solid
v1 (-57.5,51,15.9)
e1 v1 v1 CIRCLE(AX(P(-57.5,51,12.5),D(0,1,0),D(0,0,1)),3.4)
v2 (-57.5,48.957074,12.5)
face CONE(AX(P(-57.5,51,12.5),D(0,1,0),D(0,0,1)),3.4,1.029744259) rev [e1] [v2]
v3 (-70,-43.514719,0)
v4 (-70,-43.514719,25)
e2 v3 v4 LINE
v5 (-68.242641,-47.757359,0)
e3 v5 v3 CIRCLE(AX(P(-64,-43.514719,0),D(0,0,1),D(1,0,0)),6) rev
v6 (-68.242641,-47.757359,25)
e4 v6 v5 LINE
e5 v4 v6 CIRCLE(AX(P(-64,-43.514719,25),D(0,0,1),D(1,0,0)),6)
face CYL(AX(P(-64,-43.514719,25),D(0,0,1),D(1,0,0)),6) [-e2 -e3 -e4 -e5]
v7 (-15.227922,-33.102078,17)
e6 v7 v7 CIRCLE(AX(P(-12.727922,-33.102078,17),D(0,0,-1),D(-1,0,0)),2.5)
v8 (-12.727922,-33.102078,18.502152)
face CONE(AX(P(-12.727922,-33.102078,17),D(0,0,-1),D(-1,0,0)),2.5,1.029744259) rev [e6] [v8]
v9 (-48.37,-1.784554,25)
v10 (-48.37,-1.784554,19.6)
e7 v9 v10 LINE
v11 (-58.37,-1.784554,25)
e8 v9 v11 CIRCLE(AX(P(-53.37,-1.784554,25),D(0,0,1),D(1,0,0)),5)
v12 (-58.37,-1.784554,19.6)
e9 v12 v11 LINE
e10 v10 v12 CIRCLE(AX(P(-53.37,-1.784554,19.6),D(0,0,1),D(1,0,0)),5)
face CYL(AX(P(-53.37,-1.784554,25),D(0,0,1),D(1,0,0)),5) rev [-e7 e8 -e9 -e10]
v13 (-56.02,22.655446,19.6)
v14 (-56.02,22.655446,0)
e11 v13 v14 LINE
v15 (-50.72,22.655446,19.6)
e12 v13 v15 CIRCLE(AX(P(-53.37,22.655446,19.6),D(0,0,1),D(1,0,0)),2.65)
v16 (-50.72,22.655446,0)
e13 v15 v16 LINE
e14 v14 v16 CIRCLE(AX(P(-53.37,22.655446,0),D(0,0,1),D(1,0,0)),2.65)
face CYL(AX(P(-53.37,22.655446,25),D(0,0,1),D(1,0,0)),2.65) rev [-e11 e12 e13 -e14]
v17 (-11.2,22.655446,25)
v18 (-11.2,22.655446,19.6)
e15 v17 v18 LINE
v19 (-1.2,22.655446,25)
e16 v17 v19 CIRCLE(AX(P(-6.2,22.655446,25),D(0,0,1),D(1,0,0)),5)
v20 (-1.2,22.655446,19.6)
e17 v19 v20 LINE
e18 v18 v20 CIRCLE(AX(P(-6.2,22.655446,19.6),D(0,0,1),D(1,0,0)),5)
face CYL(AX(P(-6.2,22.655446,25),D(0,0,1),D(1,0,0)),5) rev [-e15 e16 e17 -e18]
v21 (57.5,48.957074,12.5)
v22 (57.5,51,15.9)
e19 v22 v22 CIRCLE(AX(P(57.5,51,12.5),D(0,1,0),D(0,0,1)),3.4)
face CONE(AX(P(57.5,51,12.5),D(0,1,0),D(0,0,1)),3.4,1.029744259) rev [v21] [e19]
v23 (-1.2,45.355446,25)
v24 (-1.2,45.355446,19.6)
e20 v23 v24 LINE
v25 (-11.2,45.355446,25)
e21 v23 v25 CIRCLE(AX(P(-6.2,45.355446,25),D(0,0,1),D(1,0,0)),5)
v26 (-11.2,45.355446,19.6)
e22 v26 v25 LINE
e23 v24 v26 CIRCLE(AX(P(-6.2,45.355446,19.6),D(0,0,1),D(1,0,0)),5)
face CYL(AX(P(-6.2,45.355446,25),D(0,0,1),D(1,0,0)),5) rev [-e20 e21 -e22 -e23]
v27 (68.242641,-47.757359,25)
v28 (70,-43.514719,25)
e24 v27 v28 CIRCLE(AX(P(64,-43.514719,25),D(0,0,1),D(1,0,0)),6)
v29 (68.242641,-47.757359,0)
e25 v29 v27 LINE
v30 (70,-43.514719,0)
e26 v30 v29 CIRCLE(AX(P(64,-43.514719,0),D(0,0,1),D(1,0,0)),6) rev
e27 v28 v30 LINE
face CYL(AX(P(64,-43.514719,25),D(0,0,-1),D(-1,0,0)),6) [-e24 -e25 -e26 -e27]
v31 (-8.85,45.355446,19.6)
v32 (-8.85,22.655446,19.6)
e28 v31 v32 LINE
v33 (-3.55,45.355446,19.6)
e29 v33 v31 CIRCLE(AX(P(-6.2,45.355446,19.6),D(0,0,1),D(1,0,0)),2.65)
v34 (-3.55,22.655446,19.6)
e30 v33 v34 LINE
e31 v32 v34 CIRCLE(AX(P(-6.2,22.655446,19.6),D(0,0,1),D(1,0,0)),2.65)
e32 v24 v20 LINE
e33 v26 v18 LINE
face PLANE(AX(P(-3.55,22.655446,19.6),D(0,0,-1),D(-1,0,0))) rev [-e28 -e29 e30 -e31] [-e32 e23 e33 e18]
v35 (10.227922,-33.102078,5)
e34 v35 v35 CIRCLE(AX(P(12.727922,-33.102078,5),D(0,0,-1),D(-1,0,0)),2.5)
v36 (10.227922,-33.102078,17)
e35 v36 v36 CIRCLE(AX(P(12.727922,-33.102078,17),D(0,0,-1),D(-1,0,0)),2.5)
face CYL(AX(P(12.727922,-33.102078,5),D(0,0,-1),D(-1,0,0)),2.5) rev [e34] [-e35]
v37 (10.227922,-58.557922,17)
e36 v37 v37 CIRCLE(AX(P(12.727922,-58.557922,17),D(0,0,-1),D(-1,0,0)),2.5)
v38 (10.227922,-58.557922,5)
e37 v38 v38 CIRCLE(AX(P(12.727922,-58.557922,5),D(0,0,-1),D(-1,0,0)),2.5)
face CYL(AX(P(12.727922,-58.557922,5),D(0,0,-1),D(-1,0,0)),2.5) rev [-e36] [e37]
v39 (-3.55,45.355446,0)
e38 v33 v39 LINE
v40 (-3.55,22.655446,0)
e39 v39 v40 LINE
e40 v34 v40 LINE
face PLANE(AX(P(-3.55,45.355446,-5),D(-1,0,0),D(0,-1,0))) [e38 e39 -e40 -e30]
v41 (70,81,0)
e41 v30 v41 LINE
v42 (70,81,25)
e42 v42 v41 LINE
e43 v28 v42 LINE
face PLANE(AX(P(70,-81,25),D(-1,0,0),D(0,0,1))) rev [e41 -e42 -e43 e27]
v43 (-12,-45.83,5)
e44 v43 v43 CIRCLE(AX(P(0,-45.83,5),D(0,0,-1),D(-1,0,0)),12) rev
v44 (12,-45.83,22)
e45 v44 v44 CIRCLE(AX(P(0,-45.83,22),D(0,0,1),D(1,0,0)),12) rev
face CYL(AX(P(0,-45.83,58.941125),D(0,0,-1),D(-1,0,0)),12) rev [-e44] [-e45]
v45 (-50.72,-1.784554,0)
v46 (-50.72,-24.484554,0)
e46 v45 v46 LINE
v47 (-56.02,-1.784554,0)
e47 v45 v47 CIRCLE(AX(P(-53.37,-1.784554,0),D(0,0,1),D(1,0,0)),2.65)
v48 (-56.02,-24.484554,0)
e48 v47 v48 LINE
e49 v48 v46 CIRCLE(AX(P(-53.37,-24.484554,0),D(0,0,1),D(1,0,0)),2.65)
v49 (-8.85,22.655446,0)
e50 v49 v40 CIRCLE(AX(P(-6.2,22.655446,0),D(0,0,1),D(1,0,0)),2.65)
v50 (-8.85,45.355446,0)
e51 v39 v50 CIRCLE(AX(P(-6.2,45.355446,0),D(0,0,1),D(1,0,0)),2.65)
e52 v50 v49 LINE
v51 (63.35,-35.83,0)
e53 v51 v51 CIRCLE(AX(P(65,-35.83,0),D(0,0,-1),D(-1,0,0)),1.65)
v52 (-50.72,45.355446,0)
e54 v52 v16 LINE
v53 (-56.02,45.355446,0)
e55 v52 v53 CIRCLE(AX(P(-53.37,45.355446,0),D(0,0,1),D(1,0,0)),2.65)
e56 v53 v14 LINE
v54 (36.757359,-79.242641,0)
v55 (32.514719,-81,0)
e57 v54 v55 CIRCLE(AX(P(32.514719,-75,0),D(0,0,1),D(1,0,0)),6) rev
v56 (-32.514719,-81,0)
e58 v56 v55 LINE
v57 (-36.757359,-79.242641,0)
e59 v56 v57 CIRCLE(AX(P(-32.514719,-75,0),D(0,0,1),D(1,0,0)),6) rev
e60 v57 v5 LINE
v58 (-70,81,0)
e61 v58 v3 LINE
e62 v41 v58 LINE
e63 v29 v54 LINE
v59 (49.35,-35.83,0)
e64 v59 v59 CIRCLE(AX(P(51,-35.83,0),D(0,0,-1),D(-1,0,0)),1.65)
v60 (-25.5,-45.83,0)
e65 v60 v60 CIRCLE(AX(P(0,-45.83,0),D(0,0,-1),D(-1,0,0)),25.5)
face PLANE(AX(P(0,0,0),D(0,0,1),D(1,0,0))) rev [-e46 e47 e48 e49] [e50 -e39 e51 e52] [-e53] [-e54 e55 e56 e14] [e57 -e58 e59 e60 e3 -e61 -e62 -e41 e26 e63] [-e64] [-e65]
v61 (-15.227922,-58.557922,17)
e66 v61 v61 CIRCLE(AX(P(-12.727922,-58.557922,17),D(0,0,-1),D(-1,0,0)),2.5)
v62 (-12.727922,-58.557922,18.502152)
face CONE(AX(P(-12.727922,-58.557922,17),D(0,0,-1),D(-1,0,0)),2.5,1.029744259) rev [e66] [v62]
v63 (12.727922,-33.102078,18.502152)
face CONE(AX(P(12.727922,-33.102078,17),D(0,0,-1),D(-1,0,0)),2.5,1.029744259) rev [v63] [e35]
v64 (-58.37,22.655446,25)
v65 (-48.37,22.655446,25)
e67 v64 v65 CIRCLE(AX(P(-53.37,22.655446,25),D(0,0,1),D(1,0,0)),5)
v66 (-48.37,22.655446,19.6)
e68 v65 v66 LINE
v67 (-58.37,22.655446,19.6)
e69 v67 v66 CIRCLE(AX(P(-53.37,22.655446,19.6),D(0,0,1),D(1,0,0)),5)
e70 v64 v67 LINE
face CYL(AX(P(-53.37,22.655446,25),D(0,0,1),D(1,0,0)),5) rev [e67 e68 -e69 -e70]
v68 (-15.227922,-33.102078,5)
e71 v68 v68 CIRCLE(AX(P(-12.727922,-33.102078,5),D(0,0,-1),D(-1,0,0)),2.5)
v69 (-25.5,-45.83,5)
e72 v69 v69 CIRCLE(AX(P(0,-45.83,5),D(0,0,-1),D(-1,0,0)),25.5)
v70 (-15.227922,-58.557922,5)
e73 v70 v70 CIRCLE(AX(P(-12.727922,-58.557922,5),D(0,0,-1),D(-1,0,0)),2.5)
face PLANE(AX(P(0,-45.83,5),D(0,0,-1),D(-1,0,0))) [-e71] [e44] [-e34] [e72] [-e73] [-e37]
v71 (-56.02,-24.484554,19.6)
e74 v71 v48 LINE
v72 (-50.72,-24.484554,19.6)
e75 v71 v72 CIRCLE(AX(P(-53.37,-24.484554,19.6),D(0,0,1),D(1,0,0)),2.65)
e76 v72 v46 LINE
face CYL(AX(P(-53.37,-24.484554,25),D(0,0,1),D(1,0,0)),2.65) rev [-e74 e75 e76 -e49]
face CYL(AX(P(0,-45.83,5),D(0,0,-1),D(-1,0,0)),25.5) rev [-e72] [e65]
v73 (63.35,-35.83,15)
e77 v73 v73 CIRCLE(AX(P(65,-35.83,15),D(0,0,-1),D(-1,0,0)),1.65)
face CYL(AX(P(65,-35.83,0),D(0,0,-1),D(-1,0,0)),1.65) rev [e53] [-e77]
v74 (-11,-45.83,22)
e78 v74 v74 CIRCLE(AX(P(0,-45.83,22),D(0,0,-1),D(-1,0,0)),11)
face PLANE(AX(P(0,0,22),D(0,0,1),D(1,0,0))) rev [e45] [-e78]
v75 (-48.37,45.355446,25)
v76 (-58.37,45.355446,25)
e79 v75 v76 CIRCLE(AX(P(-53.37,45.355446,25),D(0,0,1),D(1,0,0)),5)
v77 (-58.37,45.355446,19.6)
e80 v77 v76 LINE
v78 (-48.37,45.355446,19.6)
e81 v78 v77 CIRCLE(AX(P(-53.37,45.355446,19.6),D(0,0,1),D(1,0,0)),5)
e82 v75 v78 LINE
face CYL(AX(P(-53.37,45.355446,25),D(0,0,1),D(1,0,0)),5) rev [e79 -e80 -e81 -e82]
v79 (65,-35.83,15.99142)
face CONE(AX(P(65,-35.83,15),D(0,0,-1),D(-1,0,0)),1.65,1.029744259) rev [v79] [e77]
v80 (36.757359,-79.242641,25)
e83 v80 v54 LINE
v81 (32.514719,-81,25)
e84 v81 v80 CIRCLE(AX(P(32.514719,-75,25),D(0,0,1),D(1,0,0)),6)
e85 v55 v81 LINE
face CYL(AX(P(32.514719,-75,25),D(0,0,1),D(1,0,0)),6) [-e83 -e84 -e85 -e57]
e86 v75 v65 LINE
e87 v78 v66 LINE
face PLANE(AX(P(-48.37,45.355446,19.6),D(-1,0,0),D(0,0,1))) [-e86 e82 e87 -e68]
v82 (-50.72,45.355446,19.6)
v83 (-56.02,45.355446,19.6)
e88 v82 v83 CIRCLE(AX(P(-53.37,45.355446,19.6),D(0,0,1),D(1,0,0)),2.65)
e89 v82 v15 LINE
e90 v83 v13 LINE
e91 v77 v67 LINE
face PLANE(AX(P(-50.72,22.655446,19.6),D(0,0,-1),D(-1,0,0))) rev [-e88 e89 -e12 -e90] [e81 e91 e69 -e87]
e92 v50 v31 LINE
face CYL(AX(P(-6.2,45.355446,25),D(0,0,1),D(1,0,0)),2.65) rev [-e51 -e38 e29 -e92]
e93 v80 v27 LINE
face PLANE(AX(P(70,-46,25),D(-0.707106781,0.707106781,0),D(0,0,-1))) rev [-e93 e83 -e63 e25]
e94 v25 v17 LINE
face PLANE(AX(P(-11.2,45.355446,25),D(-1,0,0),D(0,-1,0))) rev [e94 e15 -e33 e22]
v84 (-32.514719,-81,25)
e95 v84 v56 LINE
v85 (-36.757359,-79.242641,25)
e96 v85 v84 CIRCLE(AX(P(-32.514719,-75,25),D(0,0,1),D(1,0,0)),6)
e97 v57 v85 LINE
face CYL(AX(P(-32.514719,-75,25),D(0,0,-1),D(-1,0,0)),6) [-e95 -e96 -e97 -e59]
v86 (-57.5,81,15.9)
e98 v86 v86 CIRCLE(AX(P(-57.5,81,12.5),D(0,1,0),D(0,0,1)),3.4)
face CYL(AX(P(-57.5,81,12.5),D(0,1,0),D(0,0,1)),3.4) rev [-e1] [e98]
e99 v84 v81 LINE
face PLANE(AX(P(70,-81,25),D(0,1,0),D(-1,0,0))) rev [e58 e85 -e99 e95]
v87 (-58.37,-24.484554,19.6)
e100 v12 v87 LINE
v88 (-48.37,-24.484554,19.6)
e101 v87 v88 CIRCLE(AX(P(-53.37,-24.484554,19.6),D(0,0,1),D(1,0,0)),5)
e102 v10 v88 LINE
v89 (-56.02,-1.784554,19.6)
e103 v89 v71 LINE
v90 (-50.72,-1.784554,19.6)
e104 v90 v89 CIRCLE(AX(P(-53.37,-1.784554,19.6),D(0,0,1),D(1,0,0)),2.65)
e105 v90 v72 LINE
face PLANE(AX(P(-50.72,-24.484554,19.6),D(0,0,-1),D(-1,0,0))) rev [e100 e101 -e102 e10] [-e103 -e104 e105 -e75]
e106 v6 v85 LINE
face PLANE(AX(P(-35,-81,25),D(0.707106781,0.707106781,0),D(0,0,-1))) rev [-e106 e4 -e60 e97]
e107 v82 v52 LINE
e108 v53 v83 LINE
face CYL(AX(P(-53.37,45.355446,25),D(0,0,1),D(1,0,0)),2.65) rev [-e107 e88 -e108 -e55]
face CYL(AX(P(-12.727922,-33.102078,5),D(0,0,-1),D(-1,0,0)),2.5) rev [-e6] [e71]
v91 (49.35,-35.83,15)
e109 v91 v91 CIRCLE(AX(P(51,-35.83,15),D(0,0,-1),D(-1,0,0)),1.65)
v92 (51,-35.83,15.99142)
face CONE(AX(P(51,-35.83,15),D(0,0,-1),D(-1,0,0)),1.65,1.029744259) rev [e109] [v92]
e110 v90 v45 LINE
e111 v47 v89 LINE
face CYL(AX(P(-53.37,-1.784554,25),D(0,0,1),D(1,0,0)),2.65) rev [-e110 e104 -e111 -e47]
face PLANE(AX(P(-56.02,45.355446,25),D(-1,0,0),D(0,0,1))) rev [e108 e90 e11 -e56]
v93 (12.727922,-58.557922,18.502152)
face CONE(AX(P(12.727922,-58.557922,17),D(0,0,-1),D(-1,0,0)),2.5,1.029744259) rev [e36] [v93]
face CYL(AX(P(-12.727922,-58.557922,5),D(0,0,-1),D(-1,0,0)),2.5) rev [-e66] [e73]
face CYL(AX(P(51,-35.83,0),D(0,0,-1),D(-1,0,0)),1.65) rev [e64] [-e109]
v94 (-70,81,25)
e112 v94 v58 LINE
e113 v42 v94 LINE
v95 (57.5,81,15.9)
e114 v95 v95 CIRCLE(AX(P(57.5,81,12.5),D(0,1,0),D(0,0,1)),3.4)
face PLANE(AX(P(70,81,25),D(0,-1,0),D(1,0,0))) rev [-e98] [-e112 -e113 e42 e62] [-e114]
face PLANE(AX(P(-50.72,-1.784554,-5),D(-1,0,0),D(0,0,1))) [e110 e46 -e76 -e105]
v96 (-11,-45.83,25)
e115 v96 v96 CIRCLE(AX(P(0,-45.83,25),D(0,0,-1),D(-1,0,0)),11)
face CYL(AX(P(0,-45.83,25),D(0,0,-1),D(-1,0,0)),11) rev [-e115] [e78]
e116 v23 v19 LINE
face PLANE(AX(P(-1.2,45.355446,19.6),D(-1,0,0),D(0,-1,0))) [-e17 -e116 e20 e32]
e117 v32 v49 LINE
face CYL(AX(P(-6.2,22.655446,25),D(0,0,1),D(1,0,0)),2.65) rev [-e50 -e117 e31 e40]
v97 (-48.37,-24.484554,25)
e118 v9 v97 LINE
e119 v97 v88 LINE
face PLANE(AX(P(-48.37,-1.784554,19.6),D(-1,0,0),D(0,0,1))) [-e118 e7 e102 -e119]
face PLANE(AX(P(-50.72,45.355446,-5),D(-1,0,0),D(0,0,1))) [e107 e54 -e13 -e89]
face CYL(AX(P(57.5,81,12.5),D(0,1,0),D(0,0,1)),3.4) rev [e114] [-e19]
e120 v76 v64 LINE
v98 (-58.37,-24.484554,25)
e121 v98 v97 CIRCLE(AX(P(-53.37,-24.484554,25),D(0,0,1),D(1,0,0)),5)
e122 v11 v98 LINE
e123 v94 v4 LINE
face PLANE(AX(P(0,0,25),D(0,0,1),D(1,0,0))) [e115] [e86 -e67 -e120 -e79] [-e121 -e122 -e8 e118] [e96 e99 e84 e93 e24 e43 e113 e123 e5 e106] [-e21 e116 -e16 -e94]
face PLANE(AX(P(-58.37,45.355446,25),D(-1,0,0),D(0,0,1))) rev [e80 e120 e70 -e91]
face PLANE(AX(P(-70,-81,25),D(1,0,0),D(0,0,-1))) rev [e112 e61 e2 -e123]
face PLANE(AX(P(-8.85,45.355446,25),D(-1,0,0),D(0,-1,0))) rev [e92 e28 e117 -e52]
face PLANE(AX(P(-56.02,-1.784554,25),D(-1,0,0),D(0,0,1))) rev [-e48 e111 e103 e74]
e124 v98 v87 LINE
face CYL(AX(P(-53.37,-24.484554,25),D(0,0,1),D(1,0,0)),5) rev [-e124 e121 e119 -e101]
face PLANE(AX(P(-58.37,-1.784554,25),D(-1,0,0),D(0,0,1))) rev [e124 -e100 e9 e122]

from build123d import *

# Parameters (mm, degrees)
ESQUISSE1_W                                   = 140
ESQUISSE1_H                                   = 162
BOSS_EXTRU_1_DEPTH                            = 25
TROU_POUR_TARAUDAGE_POUR_TROU_TARAUD_M8_D     = 6.8
TROU_POUR_TARAUDAGE_POUR_TROU_TARAUD_M8_DEPTH = 30
TROU_POUR_TARAUDAGE_POUR_TROU_TARAUD_M8_TIP   = 2.042926105
CHANFREIN1_SIZE                               = 35
CONG_3_R                                      = 6
ESQUISSE15_R                                  = 12
ENL_V_MAT_EXTRU_4_DEPTH                       = 22
ESQUISSE16_R                                  = 11
ENL_V_MAT_EXTRU_5_DEPTH                       = 110.293183685
TROU_POUR_TARAUDAGE_POUR_TROU_TARAUD_M4_D     = 3.3
TROU_POUR_TARAUDAGE_POUR_TROU_TARAUD_M4_DEPTH = 15
TROU_POUR_TARAUDAGE_POUR_TROU_TARAUD_M4_TIP   = 0.991420021
ESQUISSE41_R                                  = 25.5
ENL_V_MAT_EXTRU_15_DEPTH                      = 5
TROU_POUR_TARAUDAGE_POUR_TROU_TARAUD_M6_D     = 5
TROU_POUR_TARAUDAGE_POUR_TROU_TARAUD_M6_DEPTH = 12
TROU_POUR_TARAUDAGE_POUR_TROU_TARAUD_M6_TIP   = 1.502151548
RAINURE_DE_CHAMBRAGE_POUR_VIS_T_TE_HEX_DEPTH  = 25
RAINURE_START                                 = 19.6
RAINURE_DE_CHAMBRAGE_POUR_VIS_T_TE_3_DEPTH    = 5.4


# Read off the part's stored shape, not the designer's step: Rainure de chambrage pour vis à tête hexagonale M52
with BuildPart() as part:
    # Esquisse1 → Boss.-Extru.1 (new body)
    with BuildSketch(Plane.XY):
        Rectangle(ESQUISSE1_W, ESQUISSE1_H)
    extrude(amount=BOSS_EXTRU_1_DEPTH)

    # Trou pour taraudage pour trou taraudé M81
    with Locations(Plane(origin=(0, 81, 0), x_dir=(1, 0, 0), z_dir=(0, 1, 0))):
        with Locations((-57.5, -12.5), (57.5, -12.5)):
            Hole(TROU_POUR_TARAUDAGE_POUR_TROU_TARAUD_M8_D / 2, depth=TROU_POUR_TARAUDAGE_POUR_TROU_TARAUD_M8_DEPTH)
            with Locations((0, 0, -(TROU_POUR_TARAUDAGE_POUR_TROU_TARAUD_M8_DEPTH + TROU_POUR_TARAUDAGE_POUR_TROU_TARAUD_M8_TIP / 2))):  # 118° drill point
                Cone(0, TROU_POUR_TARAUDAGE_POUR_TROU_TARAUD_M8_D / 2, TROU_POUR_TARAUDAGE_POUR_TROU_TARAUD_M8_TIP, mode=Mode.SUBTRACT)

    # Chanfrein1
    chanfrein1_edges = [part.edges().sort_by_distance(p)[0] for p in [
        (70, -81, 12.5),
        (-70, -81, 12.5),
    ]]
    chamfer(chanfrein1_edges, length=CHANFREIN1_SIZE)

    # Congé3
    cong_3_edges = [part.edges().sort_by_distance(p)[0] for p in [
        (35, -81, 12.5),
        (-35, -81, 12.5),
        (-70, -46, 12.5),
        (70, -46, 12.5),
    ]]
    fillet(cong_3_edges, radius=CONG_3_R)

    # Esquisse15 → Enlèv. mat.-Extru.4 (cut)
    with BuildSketch(Plane(origin=(0, 0, 0), x_dir=(-1, 0, 0), z_dir=(0, 0, -1))):
        with Locations((0, -45.83)):
            Circle(ESQUISSE15_R)
    extrude(amount=-ENL_V_MAT_EXTRU_4_DEPTH, mode=Mode.SUBTRACT)

    # Esquisse16 → Enlèv. mat.-Extru.5 (cut, through all)
    with BuildSketch(Plane(origin=(0, 0, 22), x_dir=(-1, 0, 0), z_dir=(0, 0, -1))):
        with Locations((0, -45.83)):
            Circle(ESQUISSE16_R)
    extrude(amount=-ENL_V_MAT_EXTRU_5_DEPTH, mode=Mode.SUBTRACT)

    # Trou pour taraudage pour trou taraudé M41
    with Locations(Plane(origin=(0, 0, 0), x_dir=(-1, 0, 0), z_dir=(0, 0, -1))):
        with Locations((-65, -35.83), (-51, -35.83)):
            Hole(TROU_POUR_TARAUDAGE_POUR_TROU_TARAUD_M4_D / 2, depth=TROU_POUR_TARAUDAGE_POUR_TROU_TARAUD_M4_DEPTH)
            with Locations((0, 0, -(TROU_POUR_TARAUDAGE_POUR_TROU_TARAUD_M4_DEPTH + TROU_POUR_TARAUDAGE_POUR_TROU_TARAUD_M4_TIP / 2))):  # 118° drill point
                Cone(0, TROU_POUR_TARAUDAGE_POUR_TROU_TARAUD_M4_D / 2, TROU_POUR_TARAUDAGE_POUR_TROU_TARAUD_M4_TIP, mode=Mode.SUBTRACT)

    # Esquisse41 → Enlèv. mat.-Extru.15 (cut)
    with BuildSketch(Plane(origin=(0, 0, 0), x_dir=(-1, 0, 0), z_dir=(0, 0, -1))):
        with Locations((0, -45.83)):
            Circle(ESQUISSE41_R)
    extrude(amount=-ENL_V_MAT_EXTRU_15_DEPTH, mode=Mode.SUBTRACT)

    # Trou pour taraudage pour trou taraudé M61
    with Locations(Plane(origin=(0, 0, 5), x_dir=(-1, 0, 0), z_dir=(0, 0, -1))):
        with Locations((12.727922061, -33.102077939), (-12.727922061, -58.557922061), (-12.727922061, -33.102077939), (12.727922061, -58.557922061)):
            Hole(TROU_POUR_TARAUDAGE_POUR_TROU_TARAUD_M6_D / 2, depth=TROU_POUR_TARAUDAGE_POUR_TROU_TARAUD_M6_DEPTH)
            with Locations((0, 0, -(TROU_POUR_TARAUDAGE_POUR_TROU_TARAUD_M6_DEPTH + TROU_POUR_TARAUDAGE_POUR_TROU_TARAUD_M6_TIP / 2))):  # 118° drill point
                Cone(0, TROU_POUR_TARAUDAGE_POUR_TROU_TARAUD_M6_D / 2, TROU_POUR_TARAUDAGE_POUR_TROU_TARAUD_M6_TIP, mode=Mode.SUBTRACT)

    # Rainure de chambrage pour vis _ t_te 2 → Rainure de chambrage pour vis à tête hexagonale M52 (cut)
    with BuildSketch(Plane.XY):
        with BuildLine():
            Line((-50.72, -24.484553863), (-50.72, -1.784553863))
            ThreePointArc((-50.72, -1.784553863), (-53.37, 0.865446137), (-56.02, -1.784553863))
            Line((-56.02, -1.784553863), (-56.02, -24.484553863))
            ThreePointArc((-56.02, -24.484553863), (-53.37, -27.134553863), (-50.72, -24.484553863))
        make_face()
        with BuildLine():
            Line((-50.72, 22.655446137), (-50.72, 45.355446137))
            ThreePointArc((-50.72, 45.355446137), (-53.37, 48.005446137), (-56.02, 45.355446137))
            Line((-56.02, 45.355446137), (-56.02, 22.655446137))
            ThreePointArc((-56.02, 22.655446137), (-53.37, 20.005446137), (-50.72, 22.655446137))
        make_face()
        with BuildLine():
            Line((-8.85, 45.355446137), (-8.85, 22.655446137))
            ThreePointArc((-8.85, 22.655446137), (-6.2, 20.005446137), (-3.55, 22.655446137))
            Line((-3.55, 22.655446137), (-3.55, 45.355446137))
            ThreePointArc((-3.55, 45.355446137), (-6.2, 48.005446137), (-8.85, 45.355446137))
        make_face()
    extrude(amount=RAINURE_DE_CHAMBRAGE_POUR_VIS_T_TE_HEX_DEPTH, mode=Mode.SUBTRACT)

    # Rainure de chambrage pour vis _ t_te 3 o → Rainure de chambrage pour vis _ t_te 3 (cut)
    # profile 1 of 3: a face of its own
    with BuildSketch(Plane.XY.offset(RAINURE_START)):
        with BuildLine():
            Line((-58.37, -1.784553863), (-58.37, -24.484553863))
            ThreePointArc((-58.37, -24.484553863), (-53.37, -29.484553863), (-48.37, -24.484553863))
            Line((-48.37, -24.484553863), (-48.37, -1.784553863))
            ThreePointArc((-48.37, -1.784553863), (-53.37, 3.215446137), (-58.37, -1.784553863))
        make_face()
        with BuildLine():
            ThreePointArc((-56.02, -1.784553863), (-53.37, 0.865446137), (-50.72, -1.784553863))
            Line((-50.72, -1.784553863), (-50.72, -24.484553863))
            ThreePointArc((-50.72, -24.484553863), (-53.37, -27.134553863), (-56.02, -24.484553863))
            Line((-56.02, -24.484553863), (-56.02, -1.784553863))
        make_face(mode=Mode.SUBTRACT)
    # profile 2 of 3: a face of its own
    with BuildSketch(Plane.XY.offset(RAINURE_START)):
        with BuildLine():
            Line((-48.37, 22.655446137), (-48.37, 45.355446137))
            ThreePointArc((-48.37, 45.355446137), (-53.37, 50.355446137), (-58.37, 45.355446137))
            Line((-58.37, 45.355446137), (-58.37, 22.655446137))
            ThreePointArc((-58.37, 22.655446137), (-53.37, 17.655446137), (-48.37, 22.655446137))
        make_face()
        with BuildLine():
            ThreePointArc((-56.02, 45.355446137), (-53.37, 48.005446137), (-50.72, 45.355446137))
            Line((-50.72, 45.355446137), (-50.72, 22.655446137))
            ThreePointArc((-50.72, 22.655446137), (-53.37, 20.005446137), (-56.02, 22.655446137))
            Line((-56.02, 22.655446137), (-56.02, 45.355446137))
        make_face(mode=Mode.SUBTRACT)
    # profile 3 of 3: a face of its own
    with BuildSketch(Plane.XY.offset(RAINURE_START)):
        with BuildLine():
            Line((-11.2, 45.355446137), (-11.2, 22.655446137))
            ThreePointArc((-11.2, 22.655446137), (-6.2, 17.655446137), (-1.2, 22.655446137))
            Line((-1.2, 22.655446137), (-1.2, 45.355446137))
            ThreePointArc((-1.2, 45.355446137), (-6.2, 50.355446137), (-11.2, 45.355446137))
        make_face()
        with BuildLine():
            ThreePointArc((-3.55, 22.655446137), (-6.2, 20.005446137), (-8.85, 22.655446137))
            Line((-8.85, 22.655446137), (-8.85, 45.355446137))
            ThreePointArc((-8.85, 45.355446137), (-6.2, 48.005446137), (-3.55, 45.355446137))
            Line((-3.55, 45.355446137), (-3.55, 22.655446137))
        make_face(mode=Mode.SUBTRACT)
    extrude(amount=RAINURE_DE_CHAMBRAGE_POUR_VIS_T_TE_3_DEPTH, mode=Mode.SUBTRACT)


solid = part.part
